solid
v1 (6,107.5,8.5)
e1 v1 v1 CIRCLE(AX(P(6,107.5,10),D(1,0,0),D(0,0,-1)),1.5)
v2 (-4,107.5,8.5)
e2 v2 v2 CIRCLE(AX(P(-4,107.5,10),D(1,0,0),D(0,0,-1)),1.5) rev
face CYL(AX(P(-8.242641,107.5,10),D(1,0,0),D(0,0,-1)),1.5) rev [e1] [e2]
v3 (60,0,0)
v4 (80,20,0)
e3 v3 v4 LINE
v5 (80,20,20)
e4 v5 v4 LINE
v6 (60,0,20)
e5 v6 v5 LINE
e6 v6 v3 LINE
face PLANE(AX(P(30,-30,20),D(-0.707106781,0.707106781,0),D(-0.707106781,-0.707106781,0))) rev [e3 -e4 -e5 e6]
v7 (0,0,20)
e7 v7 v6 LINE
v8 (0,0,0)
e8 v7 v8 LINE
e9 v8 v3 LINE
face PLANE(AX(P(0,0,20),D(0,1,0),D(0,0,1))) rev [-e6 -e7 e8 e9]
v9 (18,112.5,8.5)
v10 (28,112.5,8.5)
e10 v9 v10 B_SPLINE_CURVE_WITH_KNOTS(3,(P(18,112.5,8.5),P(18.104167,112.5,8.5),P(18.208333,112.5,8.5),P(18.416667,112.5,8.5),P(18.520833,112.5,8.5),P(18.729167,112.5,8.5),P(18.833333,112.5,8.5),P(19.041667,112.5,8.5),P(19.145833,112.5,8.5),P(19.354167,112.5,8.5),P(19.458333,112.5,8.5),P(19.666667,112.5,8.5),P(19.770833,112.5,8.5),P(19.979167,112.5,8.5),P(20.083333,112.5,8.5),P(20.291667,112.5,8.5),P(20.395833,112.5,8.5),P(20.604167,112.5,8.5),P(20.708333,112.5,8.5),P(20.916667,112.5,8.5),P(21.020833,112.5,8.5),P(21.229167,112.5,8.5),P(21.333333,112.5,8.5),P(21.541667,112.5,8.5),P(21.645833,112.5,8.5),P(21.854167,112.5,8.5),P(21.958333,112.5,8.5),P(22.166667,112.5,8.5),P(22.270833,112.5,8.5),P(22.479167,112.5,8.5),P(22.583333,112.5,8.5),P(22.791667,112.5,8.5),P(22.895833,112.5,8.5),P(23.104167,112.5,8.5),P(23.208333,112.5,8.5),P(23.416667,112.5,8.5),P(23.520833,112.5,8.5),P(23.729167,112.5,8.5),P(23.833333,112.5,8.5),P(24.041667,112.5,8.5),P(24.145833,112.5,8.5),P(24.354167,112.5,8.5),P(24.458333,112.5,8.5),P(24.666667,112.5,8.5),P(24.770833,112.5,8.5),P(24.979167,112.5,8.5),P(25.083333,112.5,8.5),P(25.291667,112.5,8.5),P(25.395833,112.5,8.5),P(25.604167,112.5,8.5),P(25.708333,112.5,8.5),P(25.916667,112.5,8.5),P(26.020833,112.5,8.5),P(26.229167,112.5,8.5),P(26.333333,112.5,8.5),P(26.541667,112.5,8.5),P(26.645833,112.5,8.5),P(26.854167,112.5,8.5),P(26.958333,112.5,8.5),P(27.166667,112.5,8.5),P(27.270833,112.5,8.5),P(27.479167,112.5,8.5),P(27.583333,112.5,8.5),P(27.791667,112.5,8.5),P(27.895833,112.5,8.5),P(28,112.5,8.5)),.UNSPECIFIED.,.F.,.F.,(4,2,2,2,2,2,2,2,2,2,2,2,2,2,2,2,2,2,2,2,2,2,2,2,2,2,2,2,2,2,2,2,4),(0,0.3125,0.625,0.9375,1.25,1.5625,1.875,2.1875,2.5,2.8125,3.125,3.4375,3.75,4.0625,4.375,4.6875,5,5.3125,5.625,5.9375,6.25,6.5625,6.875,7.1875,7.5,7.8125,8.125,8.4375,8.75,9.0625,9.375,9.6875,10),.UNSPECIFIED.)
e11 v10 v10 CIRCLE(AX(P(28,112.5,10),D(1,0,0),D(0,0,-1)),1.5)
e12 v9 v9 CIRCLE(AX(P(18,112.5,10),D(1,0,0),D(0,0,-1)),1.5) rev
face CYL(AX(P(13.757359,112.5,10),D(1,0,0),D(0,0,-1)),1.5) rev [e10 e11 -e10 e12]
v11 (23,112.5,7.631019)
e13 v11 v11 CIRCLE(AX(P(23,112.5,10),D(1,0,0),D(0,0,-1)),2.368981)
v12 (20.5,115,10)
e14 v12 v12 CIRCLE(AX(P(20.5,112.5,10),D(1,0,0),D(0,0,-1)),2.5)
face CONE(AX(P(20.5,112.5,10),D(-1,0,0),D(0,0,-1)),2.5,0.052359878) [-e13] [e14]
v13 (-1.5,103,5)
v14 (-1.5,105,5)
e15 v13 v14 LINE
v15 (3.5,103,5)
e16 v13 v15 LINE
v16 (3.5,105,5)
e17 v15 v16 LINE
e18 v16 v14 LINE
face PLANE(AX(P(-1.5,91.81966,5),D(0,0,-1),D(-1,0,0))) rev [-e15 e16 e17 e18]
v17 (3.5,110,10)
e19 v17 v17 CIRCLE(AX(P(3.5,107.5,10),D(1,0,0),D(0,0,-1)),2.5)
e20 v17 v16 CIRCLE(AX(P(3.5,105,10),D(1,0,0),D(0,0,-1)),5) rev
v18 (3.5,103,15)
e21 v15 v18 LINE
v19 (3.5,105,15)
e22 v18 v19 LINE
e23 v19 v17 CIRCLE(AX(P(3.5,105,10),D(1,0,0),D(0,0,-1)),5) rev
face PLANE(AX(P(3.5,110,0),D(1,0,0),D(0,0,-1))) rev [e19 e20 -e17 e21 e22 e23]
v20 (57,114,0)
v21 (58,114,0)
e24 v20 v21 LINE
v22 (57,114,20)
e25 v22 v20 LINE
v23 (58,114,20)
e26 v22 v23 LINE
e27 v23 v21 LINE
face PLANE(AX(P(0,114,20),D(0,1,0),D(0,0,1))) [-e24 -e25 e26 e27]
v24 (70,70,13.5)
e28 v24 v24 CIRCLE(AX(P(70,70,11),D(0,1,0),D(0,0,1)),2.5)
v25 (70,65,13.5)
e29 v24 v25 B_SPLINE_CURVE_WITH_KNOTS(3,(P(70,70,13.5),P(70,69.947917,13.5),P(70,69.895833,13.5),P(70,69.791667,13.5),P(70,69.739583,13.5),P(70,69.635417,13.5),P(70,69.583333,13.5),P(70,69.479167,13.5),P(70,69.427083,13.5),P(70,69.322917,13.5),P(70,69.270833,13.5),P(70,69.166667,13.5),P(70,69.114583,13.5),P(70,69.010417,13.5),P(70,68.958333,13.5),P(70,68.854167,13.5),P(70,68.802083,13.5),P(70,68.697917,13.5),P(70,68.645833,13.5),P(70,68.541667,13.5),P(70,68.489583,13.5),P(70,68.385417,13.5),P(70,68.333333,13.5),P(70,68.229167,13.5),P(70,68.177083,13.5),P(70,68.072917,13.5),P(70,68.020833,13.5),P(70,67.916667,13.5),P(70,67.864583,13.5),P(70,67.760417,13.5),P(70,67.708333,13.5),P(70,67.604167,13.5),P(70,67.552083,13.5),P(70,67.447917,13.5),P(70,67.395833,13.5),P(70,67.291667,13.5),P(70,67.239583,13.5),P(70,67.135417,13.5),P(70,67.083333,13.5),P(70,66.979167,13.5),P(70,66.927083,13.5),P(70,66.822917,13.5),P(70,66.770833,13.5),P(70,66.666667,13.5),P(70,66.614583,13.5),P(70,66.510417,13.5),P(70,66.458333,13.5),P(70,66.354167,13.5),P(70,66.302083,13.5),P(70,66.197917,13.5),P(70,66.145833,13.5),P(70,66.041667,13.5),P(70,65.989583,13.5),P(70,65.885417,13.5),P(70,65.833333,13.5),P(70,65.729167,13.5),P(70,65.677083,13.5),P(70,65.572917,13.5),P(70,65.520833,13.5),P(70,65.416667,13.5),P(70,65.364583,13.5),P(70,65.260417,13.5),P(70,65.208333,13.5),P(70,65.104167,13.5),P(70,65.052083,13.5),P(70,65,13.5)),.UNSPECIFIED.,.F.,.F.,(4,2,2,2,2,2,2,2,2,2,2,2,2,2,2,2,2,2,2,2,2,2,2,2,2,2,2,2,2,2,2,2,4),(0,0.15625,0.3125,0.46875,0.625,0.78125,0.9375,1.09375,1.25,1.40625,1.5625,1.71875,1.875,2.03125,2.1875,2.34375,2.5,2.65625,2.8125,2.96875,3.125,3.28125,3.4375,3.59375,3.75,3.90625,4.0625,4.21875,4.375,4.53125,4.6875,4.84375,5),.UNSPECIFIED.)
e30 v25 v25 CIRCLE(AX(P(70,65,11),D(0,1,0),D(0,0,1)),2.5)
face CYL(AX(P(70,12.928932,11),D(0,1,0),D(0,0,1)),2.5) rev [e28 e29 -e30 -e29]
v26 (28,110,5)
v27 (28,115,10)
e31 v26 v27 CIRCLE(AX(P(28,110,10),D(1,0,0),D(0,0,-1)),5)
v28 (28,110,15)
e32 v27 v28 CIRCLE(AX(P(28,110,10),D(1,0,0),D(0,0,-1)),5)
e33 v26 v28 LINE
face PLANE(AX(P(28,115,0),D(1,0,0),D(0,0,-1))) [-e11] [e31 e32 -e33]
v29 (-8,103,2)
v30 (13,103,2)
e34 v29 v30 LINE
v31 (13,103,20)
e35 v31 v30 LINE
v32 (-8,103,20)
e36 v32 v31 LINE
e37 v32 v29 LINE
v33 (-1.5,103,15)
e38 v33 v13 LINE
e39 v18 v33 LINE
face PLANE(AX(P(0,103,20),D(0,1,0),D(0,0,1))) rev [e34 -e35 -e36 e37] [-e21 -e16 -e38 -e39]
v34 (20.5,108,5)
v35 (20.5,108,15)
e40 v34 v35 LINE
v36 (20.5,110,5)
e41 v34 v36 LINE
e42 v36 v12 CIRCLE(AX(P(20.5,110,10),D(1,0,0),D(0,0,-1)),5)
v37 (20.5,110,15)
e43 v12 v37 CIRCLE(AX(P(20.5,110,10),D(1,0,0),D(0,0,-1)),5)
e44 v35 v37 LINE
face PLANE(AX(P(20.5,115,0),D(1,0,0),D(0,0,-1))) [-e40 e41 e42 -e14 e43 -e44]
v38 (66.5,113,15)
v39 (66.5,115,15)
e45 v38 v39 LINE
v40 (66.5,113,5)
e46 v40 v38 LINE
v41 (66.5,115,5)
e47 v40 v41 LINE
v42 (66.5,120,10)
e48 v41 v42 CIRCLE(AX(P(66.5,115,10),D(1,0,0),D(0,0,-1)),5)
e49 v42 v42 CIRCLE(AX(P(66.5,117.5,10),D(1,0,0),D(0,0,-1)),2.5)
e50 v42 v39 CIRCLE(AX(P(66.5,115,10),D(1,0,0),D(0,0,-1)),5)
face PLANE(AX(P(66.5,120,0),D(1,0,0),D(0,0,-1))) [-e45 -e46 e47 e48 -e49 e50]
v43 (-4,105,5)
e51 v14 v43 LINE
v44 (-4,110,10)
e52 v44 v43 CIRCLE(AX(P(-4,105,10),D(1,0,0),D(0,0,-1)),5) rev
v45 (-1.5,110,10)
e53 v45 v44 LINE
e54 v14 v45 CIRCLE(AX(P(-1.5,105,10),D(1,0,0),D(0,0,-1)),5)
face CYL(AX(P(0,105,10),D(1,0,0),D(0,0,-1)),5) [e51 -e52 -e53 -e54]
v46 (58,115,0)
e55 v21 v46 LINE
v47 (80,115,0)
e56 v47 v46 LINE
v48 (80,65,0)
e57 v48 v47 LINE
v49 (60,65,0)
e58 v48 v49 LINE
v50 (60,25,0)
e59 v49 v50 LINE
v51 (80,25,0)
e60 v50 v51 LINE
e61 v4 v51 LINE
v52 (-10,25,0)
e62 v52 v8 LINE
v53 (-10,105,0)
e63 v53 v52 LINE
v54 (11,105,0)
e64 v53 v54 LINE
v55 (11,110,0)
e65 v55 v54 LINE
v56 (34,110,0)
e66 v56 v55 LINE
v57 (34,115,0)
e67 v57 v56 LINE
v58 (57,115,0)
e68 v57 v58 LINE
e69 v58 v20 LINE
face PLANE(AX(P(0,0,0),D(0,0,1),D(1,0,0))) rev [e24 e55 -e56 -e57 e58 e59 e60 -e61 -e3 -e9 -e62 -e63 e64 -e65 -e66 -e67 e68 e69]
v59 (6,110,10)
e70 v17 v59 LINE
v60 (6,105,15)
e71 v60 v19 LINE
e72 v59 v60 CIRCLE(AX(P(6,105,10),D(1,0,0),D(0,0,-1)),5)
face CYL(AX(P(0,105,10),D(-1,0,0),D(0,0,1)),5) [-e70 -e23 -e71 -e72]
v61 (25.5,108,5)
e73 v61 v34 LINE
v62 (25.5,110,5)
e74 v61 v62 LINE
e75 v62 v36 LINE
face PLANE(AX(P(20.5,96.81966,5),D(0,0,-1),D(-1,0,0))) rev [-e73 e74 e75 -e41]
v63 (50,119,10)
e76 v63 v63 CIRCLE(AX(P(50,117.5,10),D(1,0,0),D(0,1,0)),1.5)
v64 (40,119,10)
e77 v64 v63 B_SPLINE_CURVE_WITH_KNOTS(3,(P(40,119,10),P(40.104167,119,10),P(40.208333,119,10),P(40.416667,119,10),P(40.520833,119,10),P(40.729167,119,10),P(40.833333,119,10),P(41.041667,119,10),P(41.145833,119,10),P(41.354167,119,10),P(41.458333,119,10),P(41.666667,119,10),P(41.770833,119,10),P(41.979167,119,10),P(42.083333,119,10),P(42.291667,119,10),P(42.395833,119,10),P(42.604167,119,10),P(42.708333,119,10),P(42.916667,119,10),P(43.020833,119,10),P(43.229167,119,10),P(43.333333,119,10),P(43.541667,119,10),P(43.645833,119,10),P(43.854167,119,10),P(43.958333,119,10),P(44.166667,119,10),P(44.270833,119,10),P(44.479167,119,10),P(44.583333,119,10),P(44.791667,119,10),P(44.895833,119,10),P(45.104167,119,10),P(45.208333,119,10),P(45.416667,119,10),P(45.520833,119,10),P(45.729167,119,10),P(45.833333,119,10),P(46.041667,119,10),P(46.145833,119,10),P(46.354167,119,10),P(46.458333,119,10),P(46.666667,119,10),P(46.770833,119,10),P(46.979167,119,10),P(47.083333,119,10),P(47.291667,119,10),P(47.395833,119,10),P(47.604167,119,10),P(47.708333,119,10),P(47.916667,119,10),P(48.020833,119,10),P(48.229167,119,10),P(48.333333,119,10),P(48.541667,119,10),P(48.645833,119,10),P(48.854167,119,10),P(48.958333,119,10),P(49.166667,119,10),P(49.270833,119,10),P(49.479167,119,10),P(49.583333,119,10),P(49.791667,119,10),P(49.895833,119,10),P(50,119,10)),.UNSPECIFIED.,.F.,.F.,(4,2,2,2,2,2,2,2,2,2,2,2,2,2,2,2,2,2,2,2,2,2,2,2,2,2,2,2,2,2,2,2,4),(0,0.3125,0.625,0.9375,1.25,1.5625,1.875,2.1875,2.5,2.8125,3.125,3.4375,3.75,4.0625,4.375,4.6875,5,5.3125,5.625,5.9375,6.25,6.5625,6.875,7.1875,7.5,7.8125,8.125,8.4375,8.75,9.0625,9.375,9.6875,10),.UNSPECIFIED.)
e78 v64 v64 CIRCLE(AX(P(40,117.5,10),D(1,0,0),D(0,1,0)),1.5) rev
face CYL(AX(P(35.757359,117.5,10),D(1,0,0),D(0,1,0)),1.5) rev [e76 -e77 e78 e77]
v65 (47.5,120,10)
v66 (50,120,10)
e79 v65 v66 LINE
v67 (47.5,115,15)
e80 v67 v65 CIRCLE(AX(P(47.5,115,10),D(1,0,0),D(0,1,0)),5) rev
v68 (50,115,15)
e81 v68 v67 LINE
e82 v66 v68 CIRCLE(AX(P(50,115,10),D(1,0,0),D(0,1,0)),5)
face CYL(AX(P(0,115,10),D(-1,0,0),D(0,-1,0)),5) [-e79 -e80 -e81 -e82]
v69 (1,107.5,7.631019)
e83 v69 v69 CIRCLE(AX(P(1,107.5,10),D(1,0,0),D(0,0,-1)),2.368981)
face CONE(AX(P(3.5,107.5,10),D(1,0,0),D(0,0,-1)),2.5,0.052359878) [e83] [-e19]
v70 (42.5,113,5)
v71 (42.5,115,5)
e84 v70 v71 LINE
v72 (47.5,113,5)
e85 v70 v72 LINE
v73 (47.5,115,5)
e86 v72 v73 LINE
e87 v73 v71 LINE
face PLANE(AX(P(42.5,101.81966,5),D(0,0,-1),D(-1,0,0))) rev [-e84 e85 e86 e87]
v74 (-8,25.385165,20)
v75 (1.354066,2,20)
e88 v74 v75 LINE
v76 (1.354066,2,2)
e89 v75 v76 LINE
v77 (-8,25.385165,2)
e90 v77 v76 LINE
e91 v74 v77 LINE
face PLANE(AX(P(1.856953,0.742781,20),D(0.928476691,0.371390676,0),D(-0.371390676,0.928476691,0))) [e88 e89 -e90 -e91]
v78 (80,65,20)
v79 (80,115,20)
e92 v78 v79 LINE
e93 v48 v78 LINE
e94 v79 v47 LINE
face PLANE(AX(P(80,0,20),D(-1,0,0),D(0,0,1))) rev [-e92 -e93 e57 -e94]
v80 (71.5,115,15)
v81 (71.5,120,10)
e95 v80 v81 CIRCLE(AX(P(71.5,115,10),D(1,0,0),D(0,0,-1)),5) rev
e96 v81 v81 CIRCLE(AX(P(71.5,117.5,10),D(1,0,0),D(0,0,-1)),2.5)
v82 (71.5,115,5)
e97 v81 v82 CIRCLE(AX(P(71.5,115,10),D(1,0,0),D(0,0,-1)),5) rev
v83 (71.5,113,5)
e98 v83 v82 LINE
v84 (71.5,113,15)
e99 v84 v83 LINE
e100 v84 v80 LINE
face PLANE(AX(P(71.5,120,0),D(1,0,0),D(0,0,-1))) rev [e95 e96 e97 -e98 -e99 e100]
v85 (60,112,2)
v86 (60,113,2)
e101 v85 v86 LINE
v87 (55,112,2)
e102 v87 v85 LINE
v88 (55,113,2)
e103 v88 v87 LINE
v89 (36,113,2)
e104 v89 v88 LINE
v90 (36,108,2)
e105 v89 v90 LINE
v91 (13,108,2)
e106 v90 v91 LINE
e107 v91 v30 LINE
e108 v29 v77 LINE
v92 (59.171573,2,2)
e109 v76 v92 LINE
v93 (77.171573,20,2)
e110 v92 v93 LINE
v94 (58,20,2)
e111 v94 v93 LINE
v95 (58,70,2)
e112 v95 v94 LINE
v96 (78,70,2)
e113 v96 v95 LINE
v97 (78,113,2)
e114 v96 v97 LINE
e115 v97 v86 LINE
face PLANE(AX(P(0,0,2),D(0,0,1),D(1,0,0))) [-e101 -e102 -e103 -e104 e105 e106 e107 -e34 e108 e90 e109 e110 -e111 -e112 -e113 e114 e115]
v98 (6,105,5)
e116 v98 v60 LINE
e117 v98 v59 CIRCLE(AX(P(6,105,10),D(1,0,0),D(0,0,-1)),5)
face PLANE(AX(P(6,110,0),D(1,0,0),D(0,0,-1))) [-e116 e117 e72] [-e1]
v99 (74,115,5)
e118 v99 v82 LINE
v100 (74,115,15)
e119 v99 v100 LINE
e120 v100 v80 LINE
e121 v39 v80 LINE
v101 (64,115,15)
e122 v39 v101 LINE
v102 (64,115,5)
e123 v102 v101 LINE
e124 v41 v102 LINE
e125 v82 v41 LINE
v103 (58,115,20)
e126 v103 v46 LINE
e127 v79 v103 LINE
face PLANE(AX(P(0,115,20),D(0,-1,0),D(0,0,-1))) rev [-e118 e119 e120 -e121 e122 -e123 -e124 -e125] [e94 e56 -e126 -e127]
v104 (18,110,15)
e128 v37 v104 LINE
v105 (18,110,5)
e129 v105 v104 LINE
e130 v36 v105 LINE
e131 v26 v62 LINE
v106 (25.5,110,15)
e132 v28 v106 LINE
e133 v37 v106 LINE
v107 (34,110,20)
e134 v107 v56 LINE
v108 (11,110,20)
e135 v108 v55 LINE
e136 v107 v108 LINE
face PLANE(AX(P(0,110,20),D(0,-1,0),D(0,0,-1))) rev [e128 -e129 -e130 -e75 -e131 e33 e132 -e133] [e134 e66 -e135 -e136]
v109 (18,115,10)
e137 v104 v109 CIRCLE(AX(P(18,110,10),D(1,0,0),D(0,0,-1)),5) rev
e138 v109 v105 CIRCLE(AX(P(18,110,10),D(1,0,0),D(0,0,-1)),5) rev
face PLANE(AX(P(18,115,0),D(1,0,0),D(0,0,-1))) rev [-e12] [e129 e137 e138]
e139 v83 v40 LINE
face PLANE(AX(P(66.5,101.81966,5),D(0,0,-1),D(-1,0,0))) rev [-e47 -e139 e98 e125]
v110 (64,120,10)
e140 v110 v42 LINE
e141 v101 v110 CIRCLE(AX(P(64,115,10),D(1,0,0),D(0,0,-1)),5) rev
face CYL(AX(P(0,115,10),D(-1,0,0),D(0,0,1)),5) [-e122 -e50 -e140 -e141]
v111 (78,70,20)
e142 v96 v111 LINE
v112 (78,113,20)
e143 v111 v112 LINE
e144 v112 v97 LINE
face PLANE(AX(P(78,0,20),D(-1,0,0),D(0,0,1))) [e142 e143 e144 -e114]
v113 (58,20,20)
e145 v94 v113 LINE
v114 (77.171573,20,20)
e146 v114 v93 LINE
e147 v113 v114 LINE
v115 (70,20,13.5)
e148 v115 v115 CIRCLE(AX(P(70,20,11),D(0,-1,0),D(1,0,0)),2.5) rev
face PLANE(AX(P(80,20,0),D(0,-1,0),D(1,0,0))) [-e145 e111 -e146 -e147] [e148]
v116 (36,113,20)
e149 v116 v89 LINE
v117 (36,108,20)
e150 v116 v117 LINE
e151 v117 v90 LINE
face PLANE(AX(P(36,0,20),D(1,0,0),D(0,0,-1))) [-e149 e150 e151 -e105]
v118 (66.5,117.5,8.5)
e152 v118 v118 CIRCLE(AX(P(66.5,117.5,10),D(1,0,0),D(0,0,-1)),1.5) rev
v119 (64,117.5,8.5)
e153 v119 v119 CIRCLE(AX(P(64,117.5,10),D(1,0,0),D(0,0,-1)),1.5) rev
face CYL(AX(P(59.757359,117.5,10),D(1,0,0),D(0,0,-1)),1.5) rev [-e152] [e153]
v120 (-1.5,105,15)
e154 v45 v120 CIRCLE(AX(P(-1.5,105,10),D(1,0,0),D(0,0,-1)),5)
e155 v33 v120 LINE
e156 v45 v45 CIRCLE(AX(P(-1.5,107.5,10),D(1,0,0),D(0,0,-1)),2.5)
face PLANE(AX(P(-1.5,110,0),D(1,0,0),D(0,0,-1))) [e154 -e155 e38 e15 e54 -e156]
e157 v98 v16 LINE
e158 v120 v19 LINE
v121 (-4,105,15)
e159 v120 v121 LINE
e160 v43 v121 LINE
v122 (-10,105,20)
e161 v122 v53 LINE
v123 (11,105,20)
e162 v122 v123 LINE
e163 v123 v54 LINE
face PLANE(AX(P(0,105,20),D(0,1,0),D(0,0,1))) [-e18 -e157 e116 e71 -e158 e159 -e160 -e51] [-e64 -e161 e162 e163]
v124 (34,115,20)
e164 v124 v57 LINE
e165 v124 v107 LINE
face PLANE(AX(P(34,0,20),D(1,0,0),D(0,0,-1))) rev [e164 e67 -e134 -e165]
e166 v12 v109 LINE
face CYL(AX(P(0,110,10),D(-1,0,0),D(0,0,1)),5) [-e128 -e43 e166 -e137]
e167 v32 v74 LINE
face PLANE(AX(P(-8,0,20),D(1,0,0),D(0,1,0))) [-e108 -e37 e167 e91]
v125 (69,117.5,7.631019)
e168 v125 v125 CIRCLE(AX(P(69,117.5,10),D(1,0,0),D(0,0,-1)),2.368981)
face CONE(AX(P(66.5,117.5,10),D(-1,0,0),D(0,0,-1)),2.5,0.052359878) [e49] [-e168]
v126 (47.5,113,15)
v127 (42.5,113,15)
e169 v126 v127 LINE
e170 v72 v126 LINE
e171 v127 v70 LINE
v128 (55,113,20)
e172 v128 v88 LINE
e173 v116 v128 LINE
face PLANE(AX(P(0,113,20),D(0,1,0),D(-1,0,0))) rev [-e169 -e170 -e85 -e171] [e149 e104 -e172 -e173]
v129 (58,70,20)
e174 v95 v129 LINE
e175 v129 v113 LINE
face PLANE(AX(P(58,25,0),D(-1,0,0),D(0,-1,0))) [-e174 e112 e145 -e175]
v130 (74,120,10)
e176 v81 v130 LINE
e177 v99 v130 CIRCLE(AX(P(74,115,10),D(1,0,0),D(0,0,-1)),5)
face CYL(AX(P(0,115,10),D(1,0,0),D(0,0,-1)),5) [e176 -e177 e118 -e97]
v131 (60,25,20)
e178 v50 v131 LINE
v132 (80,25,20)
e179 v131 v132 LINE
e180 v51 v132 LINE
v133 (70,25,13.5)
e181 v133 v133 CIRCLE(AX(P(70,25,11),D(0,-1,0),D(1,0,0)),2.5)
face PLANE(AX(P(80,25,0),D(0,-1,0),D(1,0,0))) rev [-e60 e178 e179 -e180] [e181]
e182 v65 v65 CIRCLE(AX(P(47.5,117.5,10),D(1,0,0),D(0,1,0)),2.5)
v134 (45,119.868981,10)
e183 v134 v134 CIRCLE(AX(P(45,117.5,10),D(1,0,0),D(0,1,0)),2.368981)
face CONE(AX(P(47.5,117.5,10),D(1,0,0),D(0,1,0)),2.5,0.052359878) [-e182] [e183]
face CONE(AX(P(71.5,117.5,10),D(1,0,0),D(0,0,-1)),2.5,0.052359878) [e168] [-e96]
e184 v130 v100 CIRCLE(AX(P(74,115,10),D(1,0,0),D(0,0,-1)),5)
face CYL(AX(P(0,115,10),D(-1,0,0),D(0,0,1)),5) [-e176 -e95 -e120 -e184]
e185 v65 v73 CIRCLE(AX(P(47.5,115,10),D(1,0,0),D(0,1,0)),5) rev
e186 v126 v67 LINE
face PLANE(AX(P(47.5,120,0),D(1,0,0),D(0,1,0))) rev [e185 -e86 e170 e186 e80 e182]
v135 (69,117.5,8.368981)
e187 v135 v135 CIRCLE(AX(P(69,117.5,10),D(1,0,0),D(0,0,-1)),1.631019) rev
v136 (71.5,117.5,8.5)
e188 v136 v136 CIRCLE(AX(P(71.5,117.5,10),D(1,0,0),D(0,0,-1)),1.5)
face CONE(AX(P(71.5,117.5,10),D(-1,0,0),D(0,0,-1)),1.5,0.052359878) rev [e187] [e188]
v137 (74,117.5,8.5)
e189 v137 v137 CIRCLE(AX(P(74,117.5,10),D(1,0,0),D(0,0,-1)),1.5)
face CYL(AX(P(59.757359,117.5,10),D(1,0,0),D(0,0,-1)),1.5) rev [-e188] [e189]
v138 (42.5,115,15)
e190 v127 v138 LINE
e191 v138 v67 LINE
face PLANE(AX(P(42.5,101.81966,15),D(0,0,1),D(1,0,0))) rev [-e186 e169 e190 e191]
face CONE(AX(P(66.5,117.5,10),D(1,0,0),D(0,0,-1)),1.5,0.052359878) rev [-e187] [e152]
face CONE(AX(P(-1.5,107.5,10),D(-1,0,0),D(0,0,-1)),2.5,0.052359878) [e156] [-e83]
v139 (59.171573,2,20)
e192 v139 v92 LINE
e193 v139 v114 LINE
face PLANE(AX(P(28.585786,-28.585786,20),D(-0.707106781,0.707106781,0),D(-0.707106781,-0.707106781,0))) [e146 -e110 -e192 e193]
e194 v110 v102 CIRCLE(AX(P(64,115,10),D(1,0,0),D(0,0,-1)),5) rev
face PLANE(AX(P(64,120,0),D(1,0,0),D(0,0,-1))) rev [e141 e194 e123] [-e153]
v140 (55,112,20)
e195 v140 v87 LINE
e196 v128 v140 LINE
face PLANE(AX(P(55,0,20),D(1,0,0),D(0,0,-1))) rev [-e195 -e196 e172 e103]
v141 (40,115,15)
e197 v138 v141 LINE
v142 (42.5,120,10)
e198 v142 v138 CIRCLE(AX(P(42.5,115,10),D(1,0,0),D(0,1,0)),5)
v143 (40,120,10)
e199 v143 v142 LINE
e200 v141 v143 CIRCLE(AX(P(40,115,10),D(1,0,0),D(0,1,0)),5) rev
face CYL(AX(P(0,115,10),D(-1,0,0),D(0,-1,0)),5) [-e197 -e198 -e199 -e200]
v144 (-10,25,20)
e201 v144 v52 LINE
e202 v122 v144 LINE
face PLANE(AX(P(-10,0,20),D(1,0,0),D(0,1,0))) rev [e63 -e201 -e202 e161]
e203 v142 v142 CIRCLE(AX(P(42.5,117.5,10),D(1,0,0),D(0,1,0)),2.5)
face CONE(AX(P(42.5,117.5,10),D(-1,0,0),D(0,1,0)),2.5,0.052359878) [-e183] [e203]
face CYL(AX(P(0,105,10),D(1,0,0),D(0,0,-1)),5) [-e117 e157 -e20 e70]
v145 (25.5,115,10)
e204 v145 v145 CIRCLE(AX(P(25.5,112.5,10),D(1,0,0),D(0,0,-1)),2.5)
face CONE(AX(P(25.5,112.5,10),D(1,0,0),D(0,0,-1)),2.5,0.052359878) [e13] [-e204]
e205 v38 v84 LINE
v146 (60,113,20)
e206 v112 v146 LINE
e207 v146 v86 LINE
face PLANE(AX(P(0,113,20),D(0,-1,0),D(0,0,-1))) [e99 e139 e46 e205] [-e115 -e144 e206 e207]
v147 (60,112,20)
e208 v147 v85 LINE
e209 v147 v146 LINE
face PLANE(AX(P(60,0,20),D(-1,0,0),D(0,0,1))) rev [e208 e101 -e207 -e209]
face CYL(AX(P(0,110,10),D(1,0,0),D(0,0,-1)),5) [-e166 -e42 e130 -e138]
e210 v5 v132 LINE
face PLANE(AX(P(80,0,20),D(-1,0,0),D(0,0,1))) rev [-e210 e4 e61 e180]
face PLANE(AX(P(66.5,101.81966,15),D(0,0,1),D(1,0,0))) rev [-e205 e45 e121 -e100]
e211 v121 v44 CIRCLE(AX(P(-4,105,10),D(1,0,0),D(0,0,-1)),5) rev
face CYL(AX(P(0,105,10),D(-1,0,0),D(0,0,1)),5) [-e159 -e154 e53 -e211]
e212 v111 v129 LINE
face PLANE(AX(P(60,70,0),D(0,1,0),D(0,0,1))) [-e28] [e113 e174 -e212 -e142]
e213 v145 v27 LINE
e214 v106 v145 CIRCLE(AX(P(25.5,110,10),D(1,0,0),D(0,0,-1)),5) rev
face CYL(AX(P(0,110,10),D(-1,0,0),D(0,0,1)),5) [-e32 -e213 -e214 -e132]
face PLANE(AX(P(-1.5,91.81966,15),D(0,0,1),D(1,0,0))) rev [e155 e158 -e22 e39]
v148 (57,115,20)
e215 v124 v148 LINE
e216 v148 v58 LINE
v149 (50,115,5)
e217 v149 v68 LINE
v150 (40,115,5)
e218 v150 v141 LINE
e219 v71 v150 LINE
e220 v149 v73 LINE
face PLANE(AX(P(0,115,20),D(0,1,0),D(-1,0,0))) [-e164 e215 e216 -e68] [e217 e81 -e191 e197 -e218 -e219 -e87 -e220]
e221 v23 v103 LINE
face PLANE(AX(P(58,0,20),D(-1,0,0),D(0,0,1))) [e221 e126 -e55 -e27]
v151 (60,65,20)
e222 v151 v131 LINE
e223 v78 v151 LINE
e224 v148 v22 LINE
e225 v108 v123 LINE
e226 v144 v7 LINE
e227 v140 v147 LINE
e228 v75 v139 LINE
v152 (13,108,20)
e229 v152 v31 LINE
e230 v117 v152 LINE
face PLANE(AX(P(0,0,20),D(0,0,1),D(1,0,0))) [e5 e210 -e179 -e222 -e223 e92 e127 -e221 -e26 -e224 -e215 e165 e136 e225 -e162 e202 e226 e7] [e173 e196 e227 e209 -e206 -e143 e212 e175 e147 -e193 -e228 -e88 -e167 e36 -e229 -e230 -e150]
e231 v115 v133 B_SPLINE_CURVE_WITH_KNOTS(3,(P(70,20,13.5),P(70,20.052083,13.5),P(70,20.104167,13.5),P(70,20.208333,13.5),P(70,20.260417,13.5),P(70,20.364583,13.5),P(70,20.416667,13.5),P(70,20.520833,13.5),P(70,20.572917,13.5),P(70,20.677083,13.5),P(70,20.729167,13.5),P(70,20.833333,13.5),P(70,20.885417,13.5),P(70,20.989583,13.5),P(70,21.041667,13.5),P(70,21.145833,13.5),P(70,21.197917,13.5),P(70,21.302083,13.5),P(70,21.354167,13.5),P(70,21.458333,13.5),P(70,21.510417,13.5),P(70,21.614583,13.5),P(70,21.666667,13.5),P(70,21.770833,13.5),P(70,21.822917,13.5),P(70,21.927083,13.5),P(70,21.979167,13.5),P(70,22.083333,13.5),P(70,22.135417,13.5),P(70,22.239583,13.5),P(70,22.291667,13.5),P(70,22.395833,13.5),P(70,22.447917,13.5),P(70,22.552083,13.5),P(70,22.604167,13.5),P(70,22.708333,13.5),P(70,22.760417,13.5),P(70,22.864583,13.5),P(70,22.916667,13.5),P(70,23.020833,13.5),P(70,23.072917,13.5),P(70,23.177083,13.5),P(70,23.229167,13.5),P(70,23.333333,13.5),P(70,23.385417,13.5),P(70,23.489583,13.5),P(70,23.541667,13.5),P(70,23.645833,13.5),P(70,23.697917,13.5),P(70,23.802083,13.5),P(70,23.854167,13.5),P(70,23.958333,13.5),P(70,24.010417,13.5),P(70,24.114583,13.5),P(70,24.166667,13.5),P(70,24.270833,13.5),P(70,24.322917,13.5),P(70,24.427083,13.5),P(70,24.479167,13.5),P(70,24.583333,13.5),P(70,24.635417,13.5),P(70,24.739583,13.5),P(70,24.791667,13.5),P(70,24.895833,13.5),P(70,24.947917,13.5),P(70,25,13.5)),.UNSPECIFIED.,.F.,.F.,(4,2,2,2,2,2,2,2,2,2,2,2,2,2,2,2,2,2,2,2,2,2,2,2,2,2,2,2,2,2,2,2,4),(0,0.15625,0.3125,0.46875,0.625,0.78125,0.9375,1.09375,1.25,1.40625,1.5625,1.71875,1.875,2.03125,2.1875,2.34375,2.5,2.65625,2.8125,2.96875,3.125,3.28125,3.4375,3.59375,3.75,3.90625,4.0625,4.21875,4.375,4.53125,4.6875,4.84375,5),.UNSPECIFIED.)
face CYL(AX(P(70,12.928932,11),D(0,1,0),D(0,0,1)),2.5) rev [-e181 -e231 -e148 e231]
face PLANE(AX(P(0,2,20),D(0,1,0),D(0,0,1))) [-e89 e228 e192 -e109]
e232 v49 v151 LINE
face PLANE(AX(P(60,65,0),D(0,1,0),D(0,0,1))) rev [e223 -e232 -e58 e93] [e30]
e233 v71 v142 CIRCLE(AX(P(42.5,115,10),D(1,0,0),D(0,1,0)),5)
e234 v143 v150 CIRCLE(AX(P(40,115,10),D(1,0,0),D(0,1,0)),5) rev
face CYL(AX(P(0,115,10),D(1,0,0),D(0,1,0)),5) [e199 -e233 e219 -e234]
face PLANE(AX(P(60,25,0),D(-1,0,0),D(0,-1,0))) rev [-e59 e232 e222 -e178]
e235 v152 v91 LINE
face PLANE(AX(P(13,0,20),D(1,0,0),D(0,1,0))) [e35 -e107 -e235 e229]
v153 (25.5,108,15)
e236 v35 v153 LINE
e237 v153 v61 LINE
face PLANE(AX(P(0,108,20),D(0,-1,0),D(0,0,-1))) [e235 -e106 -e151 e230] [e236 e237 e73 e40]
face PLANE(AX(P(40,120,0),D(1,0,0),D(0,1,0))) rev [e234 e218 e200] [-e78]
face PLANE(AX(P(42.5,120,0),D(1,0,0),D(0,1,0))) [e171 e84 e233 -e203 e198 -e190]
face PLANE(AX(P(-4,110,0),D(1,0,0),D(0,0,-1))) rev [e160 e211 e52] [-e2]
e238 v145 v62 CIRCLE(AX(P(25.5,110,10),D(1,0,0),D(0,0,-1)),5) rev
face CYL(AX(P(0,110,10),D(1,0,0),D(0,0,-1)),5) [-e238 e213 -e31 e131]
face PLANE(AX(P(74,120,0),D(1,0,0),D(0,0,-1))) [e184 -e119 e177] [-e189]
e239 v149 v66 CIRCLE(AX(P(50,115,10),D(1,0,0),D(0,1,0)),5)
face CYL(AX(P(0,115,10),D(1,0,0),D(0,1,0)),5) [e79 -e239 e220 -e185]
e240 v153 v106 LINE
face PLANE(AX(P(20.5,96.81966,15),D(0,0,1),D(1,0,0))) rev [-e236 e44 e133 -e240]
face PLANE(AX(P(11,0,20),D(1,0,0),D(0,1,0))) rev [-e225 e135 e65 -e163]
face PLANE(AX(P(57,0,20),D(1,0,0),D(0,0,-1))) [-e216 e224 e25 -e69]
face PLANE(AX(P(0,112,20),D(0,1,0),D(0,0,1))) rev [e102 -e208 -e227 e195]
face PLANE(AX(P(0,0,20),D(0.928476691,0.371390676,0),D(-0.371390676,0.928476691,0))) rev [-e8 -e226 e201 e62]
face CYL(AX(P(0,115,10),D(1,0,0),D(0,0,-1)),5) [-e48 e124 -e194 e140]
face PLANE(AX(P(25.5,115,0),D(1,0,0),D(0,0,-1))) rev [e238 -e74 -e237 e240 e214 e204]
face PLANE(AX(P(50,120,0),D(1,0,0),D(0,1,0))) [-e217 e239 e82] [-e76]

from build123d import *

# Parameters (mm, degrees)
BOSS_EXTRUDE1_DEPTH       = 20
SKETCH2_W                 = 20
SKETCH2_H                 = 40
CUT_EXTRUDE1_DEPTH        = 142.509716981
SHELL1_T                  = -2
SHELL1_THICKNESS_2_FACE_W = 20
SHELL1_THICKNESS_2_FACE_H = 18
SHELL1_THICKNESS_2_DEPTH  = 3
SHELL1_THICKNESS_3_FACE_W = 18
SHELL1_THICKNESS_3_FACE_H = 20
SHELL1_THICKNESS_3_DEPTH  = 3
CUT_EXTRUDE14_REACH       = 110.167
SKETCH34_R                = 2.5
SKETCH3_W                 = 2.5
SKETCH3_H                 = 10
BOSS_EXTRUDE2_DEPTH       = 5
FILLET2_R                 = 5
CUT_EXTRUDE3_REACH        = 149.838
SKETCH6_R                 = 1.5
SKETCH21_R                = 2.5
SKETCH21_R_2              = 1.5
BOSS_EXTRUDE10_DEPTH      = 2.5
BOSS_EXTRUDE10_DRAFT      = 3
MIRROR7_COPY_1_SKETCH_R   = 2.5
MIRROR7_COPY_1_SKETCH_R_2 = 1.5
MIRROR7_COPY_1_DEPTH      = 2.5
MIRROR7_COPY_1_DRAFT      = 3
SKETCH26_W                = 5
SKETCH26_H                = 10
CUT_EXTRUDE8_DEPTH        = 2
SKETCH7_W                 = 2.5
SKETCH7_H                 = 10
BOSS_EXTRUDE4_DEPTH       = 5
FILLET4_R                 = 5
SKETCH22_R                = 2.5
BOSS_EXTRUDE11_DEPTH      = 2.5
BOSS_EXTRUDE11_TAPER      = 3
SKETCH23_R                = 1.5
CUT_EXTRUDE7_DEPTH        = 10
SKETCH27_W                = 5
SKETCH27_H                = 10
CUT_EXTRUDE9_DEPTH        = 2
SKETCH10_W                = 2.5
SKETCH10_H                = 10
BOSS_EXTRUDE6_DEPTH       = 5
FILLET6_R                 = 5
SKETCH28_R                = 2.5
BOSS_EXTRUDE12_DEPTH      = 2.5
BOSS_EXTRUDE12_TAPER      = 3
SKETCH29_R                = 1.5
CUT_EXTRUDE10_DEPTH       = 10
SKETCH30_W                = 5
SKETCH30_H                = 10
CUT_EXTRUDE11_DEPTH       = 2
SKETCH13_W                = 2.5
SKETCH13_H                = 10
BOSS_EXTRUDE8_DEPTH       = 5
FILLET8_R                 = 5
SKETCH31_R                = 2.5
BOSS_EXTRUDE13_DEPTH      = 2.5
BOSS_EXTRUDE13_TAPER      = 3
SKETCH32_R                = 1.5
CUT_EXTRUDE12_DEPTH       = 10
SKETCH33_W                = 5
SKETCH33_H                = 10
CUT_EXTRUDE13_DEPTH       = 2


with BuildPart() as part:
    # Sketch1 → Boss-Extrude1 (new body)
    with BuildSketch(Plane.XY):
        Polygon((58, 114), (58, 115), (80, 115), (80, 20), (60, 0), (0, 0), (-10, 25), (-10, 105), (11, 105), (11, 110), (12, 110), (34, 110), (34, 115), (35, 115), (57, 115), (57, 114), align=None)
    extrude(amount=BOSS_EXTRUDE1_DEPTH)

    # Sketch2 → Cut-Extrude1 (cut, through all)
    with BuildSketch(Plane.XY.offset(20)):
        with Locations((70, 45)):
            Rectangle(SKETCH2_W, SKETCH2_H)
    extrude(amount=-CUT_EXTRUDE1_DEPTH, mode=Mode.SUBTRACT)

    # Shell1
    shell1_openings = [part.faces().sort_by_distance(p)[0] for p in [
        (32.550473836, 58.500730419, 20),
    ]]
    offset(amount=SHELL1_T, openings=shell1_openings, kind=Kind.INTERSECTION)

    # Shell1 thickness 2 face (on inner face of the shell) → Shell1 thickness 2 (add)
    with BuildSketch(Plane(origin=(68, 23, 11), x_dir=(1, 0, 0), z_dir=(0, 1, 0))):
        Rectangle(SHELL1_THICKNESS_2_FACE_W, SHELL1_THICKNESS_2_FACE_H)
    extrude(amount=-SHELL1_THICKNESS_2_DEPTH)

    # Shell1 thickness 3 face (on inner face of the shell) → Shell1 thickness 3 (add)
    with BuildSketch(Plane(origin=(68, 67, 11), x_dir=(0, 0, -1), z_dir=(0, -1, 0))):
        Rectangle(SHELL1_THICKNESS_3_FACE_W, SHELL1_THICKNESS_3_FACE_H)
    extrude(amount=-SHELL1_THICKNESS_3_DEPTH)

    # Cut-Extrude14: up to this face of the body (flat: up to its plane)
    cut_extrude14_end = Plane(part.part.faces().sort_by_distance((67.585786438, 20, 11))[0])
    # Sketch34 → Cut-Extrude14 (cut, up to the picked face)
    with BuildSketch(Plane(origin=(0, 70, 0), x_dir=(1, 0, 0), z_dir=(0, 1, 0)), mode=Mode.PRIVATE) as cut_extrude14_sk1:
        with Locations(Location((70, -11, 0), (0, 0, 270))):
            Circle(SKETCH34_R)
    cut_extrude14_tool1 = split(extrude(cut_extrude14_sk1.sketch, amount=-CUT_EXTRUDE14_REACH, mode=Mode.PRIVATE), bisect_by=cut_extrude14_end, keep=Keep.BOTH, mode=Mode.PRIVATE)
    add(cut_extrude14_tool1.solids().sort_by(Axis((70, 70, 11), (0, -1, 0)))[0], mode=Mode.SUBTRACT)

    # Sketch3 → Boss-Extrude2 (add)
    with BuildSketch(Plane(origin=(0, 115, 0), x_dir=(1, 0, 0), z_dir=(0, 1, 0))):
        with Locations((65.25, -10)):
            Rectangle(SKETCH3_W, SKETCH3_H)
        with Locations((72.75, -10)):
            Rectangle(SKETCH3_W, SKETCH3_H)
    extrude(amount=BOSS_EXTRUDE2_DEPTH)

    # Fillet2
    fillet2_edges = [part.edges().sort_by_distance(p)[0] for p in [
        (65.25, 120, 5),
        (65.25, 120, 15),
        (72.75, 120, 5),
        (72.75, 120, 15),
    ]]
    fillet(fillet2_edges, radius=FILLET2_R - 0.0001)  # a hair under: the kernel refuses the full size

    # Cut-Extrude3: up to this face of the body (flat: up to its plane)
    cut_extrude3_end = Plane(part.part.faces().sort_by_distance((64, 117.122079053, 10))[0])
    # Sketch6 → Cut-Extrude3 (cut, up to the picked face)
    with BuildSketch(Plane(origin=(74, 0, 0), x_dir=(0, 0, -1), z_dir=(1, 0, 0)), mode=Mode.PRIVATE) as cut_extrude3_sk1:
        with Locations((-10, 117.5)):
            Circle(SKETCH6_R)
    cut_extrude3_tool1 = split(extrude(cut_extrude3_sk1.sketch, amount=-CUT_EXTRUDE3_REACH, mode=Mode.PRIVATE), bisect_by=cut_extrude3_end, keep=Keep.BOTH, mode=Mode.PRIVATE)
    add(cut_extrude3_tool1.solids().sort_by(Axis((74, 117.5, 10), (-1, 0, 0)))[0], mode=Mode.SUBTRACT)


with BuildPart() as boss_extrude10_tool:
    # Sketch21 → Boss-Extrude10 (with draft: the straight prism first)
    with BuildSketch(Plane(origin=(66.5, 0, 0), x_dir=(0, 0, -1), z_dir=(1, 0, 0))):
        with Locations((-10, 117.5)):
            Circle(SKETCH21_R)
        with Locations((-10, 117.5)):
            Circle(SKETCH21_R_2, mode=Mode.SUBTRACT)
    extrude(amount=BOSS_EXTRUDE10_DEPTH)
    # Boss-Extrude10: the draft: its side faces are tilted about the plane it starts from
    boss_extrude10_sides = [boss_extrude10_tool.faces().sort_by_distance(p)[0] for p in [
        (67.75, 117.5, 12.5),
        (67.75, 117.5, 11.5),
    ]]
    draft(boss_extrude10_sides, Plane(origin=(66.5, 0, 0), x_dir=(0, 0, -1), z_dir=(1, 0, 0)), BOSS_EXTRUDE10_DRAFT)


with BuildPart() as part_1:
    add(part.part)

    # Boss-Extrude10: add boss_extrude10_tool
    add(boss_extrude10_tool.part)


with BuildPart() as mirror7_copy_1_tool:
    # Mirror7 copy 1 sketch → Mirror7 copy 1 (with draft: the straight prism first)
    with BuildSketch(Plane(origin=(71.5, 0, 0), x_dir=(0, 0, -1), z_dir=(-1, 0, 0))):
        with Locations((-10, -117.5)):
            Circle(MIRROR7_COPY_1_SKETCH_R)
        with Locations((-10, -117.5)):
            Circle(MIRROR7_COPY_1_SKETCH_R_2, mode=Mode.SUBTRACT)
    extrude(amount=MIRROR7_COPY_1_DEPTH)
    # Mirror7 copy 1: the draft: its side faces are tilted about the plane it starts from
    mirror7_copy_1_sides = [mirror7_copy_1_tool.faces().sort_by_distance(p)[0] for p in [
        (70.25, 117.5, 12.5),
        (70.25, 117.5, 11.5),
    ]]
    draft(mirror7_copy_1_sides, Plane(origin=(71.5, 0, 0), x_dir=(0, 0, -1), z_dir=(-1, 0, 0)), MIRROR7_COPY_1_DRAFT)


with BuildPart() as part_2:
    add(part_1.part)

    # Mirror7 copy 1: add mirror7_copy_1_tool
    add(mirror7_copy_1_tool.part)

    # Sketch26 → Cut-Extrude8 (cut)
    with BuildSketch(Plane(origin=(0, 115, 0), x_dir=(1, 0, 0), z_dir=(0, 1, 0))):
        with Locations((69, -10)):
            Rectangle(SKETCH26_W, SKETCH26_H)
    extrude(amount=-CUT_EXTRUDE8_DEPTH, mode=Mode.SUBTRACT)

    # Sketch7 → Boss-Extrude4 (add)
    with BuildSketch(Plane(origin=(0, 115, 0), x_dir=(1, 0, 0), z_dir=(0, 1, 0))):
        with Locations((41.25, -10)):
            Rectangle(SKETCH7_W, SKETCH7_H)
        with Locations((48.75, -10)):
            Rectangle(SKETCH7_W, SKETCH7_H)
    extrude(amount=BOSS_EXTRUDE4_DEPTH)

    # Fillet4
    fillet4_edges = [part_2.edges().sort_by_distance(p)[0] for p in [
        (41.25, 120, 5),
        (41.25, 120, 15),
        (48.75, 120, 5),
        (48.75, 120, 15),
    ]]
    fillet(fillet4_edges, radius=FILLET4_R - 0.0001)  # a hair under: the kernel refuses the full size

    # Sketch22 → Boss-Extrude11 (add)
    with BuildSketch(Plane(origin=(42.5, 0, 0), x_dir=(0, 0, -1), z_dir=(1, 0, 0))):
        with Locations((-10, 117.5)):
            Circle(SKETCH22_R)
    boss_extrude11 = extrude(amount=BOSS_EXTRUDE11_DEPTH, taper=BOSS_EXTRUDE11_TAPER)

    # Mirror8: Boss-Extrude11 across plane
    add(boss_extrude11.mirror(Plane(origin=(45, 117.5, 10), x_dir=(0, 0, 1), z_dir=(1, 0, 0))))

    # Sketch23 → Cut-Extrude7 (cut)
    with BuildSketch(Plane(origin=(50, 0, 0), x_dir=(0, 0, -1), z_dir=(1, 0, 0))):
        with Locations((-10, 117.5)):
            Circle(SKETCH23_R)
    extrude(amount=-CUT_EXTRUDE7_DEPTH, mode=Mode.SUBTRACT)

    # Sketch27 → Cut-Extrude9 (cut)
    with BuildSketch(Plane(origin=(0, 115, 0), x_dir=(1, 0, 0), z_dir=(0, 1, 0))):
        with Locations((45, -10)):
            Rectangle(SKETCH27_W, SKETCH27_H)
    extrude(amount=-CUT_EXTRUDE9_DEPTH, mode=Mode.SUBTRACT)

    # Sketch10 → Boss-Extrude6 (add)
    with BuildSketch(Plane(origin=(0, 110, 0), x_dir=(1, 0, 0), z_dir=(0, 1, 0))):
        with Locations((19.25, -10)):
            Rectangle(SKETCH10_W, SKETCH10_H)
        with Locations((26.75, -10)):
            Rectangle(SKETCH10_W, SKETCH10_H)
    extrude(amount=BOSS_EXTRUDE6_DEPTH)

    # Fillet6
    fillet6_edges = [part_2.edges().sort_by_distance(p)[0] for p in [
        (19.25, 115, 15),
        (19.25, 115, 5),
        (26.75, 115, 5),
        (26.75, 115, 15),
    ]]
    fillet(fillet6_edges, radius=FILLET6_R - 0.0001)  # a hair under: the kernel refuses the full size

    # Sketch28 → Boss-Extrude12 (add)
    with BuildSketch(Plane(origin=(20.5, 0, 0), x_dir=(0, 0, -1), z_dir=(1, 0, 0))):
        with Locations((-10, 112.5)):
            Circle(SKETCH28_R)
    boss_extrude12 = extrude(amount=BOSS_EXTRUDE12_DEPTH, taper=BOSS_EXTRUDE12_TAPER)

    # Mirror9: Boss-Extrude12 across plane
    add(boss_extrude12.mirror(Plane(origin=(23, 112.5, 10), x_dir=(0, 0, 1), z_dir=(1, 0, 0))))

    # Sketch29 → Cut-Extrude10 (cut)
    with BuildSketch(Plane(origin=(28, 0, 0), x_dir=(0, 0, -1), z_dir=(1, 0, 0))):
        with Locations((-10, 112.5)):
            Circle(SKETCH29_R)
    extrude(amount=-CUT_EXTRUDE10_DEPTH, mode=Mode.SUBTRACT)

    # Sketch30 → Cut-Extrude11 (cut)
    with BuildSketch(Plane(origin=(0, 110, 0), x_dir=(1, 0, 0), z_dir=(0, 1, 0))):
        with Locations((23, -10)):
            Rectangle(SKETCH30_W, SKETCH30_H)
    extrude(amount=-CUT_EXTRUDE11_DEPTH, mode=Mode.SUBTRACT)

    # Sketch13 → Boss-Extrude8 (add)
    with BuildSketch(Plane(origin=(0, 105, 0), x_dir=(1, 0, 0), z_dir=(0, 1, 0))):
        with Locations((-2.75, -10)):
            Rectangle(SKETCH13_W, SKETCH13_H)
        with Locations((4.75, -10)):
            Rectangle(SKETCH13_W, SKETCH13_H)
    extrude(amount=BOSS_EXTRUDE8_DEPTH)

    # Fillet8
    fillet8_edges = [part_2.edges().sort_by_distance(p)[0] for p in [
        (-2.75, 110, 15),
        (-2.75, 110, 5),
        (4.75, 110, 5),
        (4.75, 110, 15),
    ]]
    fillet(fillet8_edges, radius=FILLET8_R - 0.0001)  # a hair under: the kernel refuses the full size

    # Sketch31 → Boss-Extrude13 (add)
    with BuildSketch(Plane(origin=(-1.5, 0, 0), x_dir=(0, 0, -1), z_dir=(1, 0, 0))):
        with Locations((-10, 107.5)):
            Circle(SKETCH31_R)
    boss_extrude13 = extrude(amount=BOSS_EXTRUDE13_DEPTH, taper=BOSS_EXTRUDE13_TAPER)

    # Mirror10: Boss-Extrude13 across plane
    add(boss_extrude13.mirror(Plane(origin=(1, 107.5, 10), x_dir=(0, 0, 1), z_dir=(1, 0, 0))))

    # Sketch32 → Cut-Extrude12 (cut)
    with BuildSketch(Plane(origin=(6, 0, 0), x_dir=(0, 0, -1), z_dir=(1, 0, 0))):
        with Locations((-10, 107.5)):
            Circle(SKETCH32_R)
    extrude(amount=-CUT_EXTRUDE12_DEPTH, mode=Mode.SUBTRACT)

    # Sketch33 → Cut-Extrude13 (cut)
    with BuildSketch(Plane(origin=(0, 105, 0), x_dir=(1, 0, 0), z_dir=(0, 1, 0))):
        with Locations((1, -10)):
            Rectangle(SKETCH33_W, SKETCH33_H)
    extrude(amount=-CUT_EXTRUDE13_DEPTH, mode=Mode.SUBTRACT)


solid = part_2.part
